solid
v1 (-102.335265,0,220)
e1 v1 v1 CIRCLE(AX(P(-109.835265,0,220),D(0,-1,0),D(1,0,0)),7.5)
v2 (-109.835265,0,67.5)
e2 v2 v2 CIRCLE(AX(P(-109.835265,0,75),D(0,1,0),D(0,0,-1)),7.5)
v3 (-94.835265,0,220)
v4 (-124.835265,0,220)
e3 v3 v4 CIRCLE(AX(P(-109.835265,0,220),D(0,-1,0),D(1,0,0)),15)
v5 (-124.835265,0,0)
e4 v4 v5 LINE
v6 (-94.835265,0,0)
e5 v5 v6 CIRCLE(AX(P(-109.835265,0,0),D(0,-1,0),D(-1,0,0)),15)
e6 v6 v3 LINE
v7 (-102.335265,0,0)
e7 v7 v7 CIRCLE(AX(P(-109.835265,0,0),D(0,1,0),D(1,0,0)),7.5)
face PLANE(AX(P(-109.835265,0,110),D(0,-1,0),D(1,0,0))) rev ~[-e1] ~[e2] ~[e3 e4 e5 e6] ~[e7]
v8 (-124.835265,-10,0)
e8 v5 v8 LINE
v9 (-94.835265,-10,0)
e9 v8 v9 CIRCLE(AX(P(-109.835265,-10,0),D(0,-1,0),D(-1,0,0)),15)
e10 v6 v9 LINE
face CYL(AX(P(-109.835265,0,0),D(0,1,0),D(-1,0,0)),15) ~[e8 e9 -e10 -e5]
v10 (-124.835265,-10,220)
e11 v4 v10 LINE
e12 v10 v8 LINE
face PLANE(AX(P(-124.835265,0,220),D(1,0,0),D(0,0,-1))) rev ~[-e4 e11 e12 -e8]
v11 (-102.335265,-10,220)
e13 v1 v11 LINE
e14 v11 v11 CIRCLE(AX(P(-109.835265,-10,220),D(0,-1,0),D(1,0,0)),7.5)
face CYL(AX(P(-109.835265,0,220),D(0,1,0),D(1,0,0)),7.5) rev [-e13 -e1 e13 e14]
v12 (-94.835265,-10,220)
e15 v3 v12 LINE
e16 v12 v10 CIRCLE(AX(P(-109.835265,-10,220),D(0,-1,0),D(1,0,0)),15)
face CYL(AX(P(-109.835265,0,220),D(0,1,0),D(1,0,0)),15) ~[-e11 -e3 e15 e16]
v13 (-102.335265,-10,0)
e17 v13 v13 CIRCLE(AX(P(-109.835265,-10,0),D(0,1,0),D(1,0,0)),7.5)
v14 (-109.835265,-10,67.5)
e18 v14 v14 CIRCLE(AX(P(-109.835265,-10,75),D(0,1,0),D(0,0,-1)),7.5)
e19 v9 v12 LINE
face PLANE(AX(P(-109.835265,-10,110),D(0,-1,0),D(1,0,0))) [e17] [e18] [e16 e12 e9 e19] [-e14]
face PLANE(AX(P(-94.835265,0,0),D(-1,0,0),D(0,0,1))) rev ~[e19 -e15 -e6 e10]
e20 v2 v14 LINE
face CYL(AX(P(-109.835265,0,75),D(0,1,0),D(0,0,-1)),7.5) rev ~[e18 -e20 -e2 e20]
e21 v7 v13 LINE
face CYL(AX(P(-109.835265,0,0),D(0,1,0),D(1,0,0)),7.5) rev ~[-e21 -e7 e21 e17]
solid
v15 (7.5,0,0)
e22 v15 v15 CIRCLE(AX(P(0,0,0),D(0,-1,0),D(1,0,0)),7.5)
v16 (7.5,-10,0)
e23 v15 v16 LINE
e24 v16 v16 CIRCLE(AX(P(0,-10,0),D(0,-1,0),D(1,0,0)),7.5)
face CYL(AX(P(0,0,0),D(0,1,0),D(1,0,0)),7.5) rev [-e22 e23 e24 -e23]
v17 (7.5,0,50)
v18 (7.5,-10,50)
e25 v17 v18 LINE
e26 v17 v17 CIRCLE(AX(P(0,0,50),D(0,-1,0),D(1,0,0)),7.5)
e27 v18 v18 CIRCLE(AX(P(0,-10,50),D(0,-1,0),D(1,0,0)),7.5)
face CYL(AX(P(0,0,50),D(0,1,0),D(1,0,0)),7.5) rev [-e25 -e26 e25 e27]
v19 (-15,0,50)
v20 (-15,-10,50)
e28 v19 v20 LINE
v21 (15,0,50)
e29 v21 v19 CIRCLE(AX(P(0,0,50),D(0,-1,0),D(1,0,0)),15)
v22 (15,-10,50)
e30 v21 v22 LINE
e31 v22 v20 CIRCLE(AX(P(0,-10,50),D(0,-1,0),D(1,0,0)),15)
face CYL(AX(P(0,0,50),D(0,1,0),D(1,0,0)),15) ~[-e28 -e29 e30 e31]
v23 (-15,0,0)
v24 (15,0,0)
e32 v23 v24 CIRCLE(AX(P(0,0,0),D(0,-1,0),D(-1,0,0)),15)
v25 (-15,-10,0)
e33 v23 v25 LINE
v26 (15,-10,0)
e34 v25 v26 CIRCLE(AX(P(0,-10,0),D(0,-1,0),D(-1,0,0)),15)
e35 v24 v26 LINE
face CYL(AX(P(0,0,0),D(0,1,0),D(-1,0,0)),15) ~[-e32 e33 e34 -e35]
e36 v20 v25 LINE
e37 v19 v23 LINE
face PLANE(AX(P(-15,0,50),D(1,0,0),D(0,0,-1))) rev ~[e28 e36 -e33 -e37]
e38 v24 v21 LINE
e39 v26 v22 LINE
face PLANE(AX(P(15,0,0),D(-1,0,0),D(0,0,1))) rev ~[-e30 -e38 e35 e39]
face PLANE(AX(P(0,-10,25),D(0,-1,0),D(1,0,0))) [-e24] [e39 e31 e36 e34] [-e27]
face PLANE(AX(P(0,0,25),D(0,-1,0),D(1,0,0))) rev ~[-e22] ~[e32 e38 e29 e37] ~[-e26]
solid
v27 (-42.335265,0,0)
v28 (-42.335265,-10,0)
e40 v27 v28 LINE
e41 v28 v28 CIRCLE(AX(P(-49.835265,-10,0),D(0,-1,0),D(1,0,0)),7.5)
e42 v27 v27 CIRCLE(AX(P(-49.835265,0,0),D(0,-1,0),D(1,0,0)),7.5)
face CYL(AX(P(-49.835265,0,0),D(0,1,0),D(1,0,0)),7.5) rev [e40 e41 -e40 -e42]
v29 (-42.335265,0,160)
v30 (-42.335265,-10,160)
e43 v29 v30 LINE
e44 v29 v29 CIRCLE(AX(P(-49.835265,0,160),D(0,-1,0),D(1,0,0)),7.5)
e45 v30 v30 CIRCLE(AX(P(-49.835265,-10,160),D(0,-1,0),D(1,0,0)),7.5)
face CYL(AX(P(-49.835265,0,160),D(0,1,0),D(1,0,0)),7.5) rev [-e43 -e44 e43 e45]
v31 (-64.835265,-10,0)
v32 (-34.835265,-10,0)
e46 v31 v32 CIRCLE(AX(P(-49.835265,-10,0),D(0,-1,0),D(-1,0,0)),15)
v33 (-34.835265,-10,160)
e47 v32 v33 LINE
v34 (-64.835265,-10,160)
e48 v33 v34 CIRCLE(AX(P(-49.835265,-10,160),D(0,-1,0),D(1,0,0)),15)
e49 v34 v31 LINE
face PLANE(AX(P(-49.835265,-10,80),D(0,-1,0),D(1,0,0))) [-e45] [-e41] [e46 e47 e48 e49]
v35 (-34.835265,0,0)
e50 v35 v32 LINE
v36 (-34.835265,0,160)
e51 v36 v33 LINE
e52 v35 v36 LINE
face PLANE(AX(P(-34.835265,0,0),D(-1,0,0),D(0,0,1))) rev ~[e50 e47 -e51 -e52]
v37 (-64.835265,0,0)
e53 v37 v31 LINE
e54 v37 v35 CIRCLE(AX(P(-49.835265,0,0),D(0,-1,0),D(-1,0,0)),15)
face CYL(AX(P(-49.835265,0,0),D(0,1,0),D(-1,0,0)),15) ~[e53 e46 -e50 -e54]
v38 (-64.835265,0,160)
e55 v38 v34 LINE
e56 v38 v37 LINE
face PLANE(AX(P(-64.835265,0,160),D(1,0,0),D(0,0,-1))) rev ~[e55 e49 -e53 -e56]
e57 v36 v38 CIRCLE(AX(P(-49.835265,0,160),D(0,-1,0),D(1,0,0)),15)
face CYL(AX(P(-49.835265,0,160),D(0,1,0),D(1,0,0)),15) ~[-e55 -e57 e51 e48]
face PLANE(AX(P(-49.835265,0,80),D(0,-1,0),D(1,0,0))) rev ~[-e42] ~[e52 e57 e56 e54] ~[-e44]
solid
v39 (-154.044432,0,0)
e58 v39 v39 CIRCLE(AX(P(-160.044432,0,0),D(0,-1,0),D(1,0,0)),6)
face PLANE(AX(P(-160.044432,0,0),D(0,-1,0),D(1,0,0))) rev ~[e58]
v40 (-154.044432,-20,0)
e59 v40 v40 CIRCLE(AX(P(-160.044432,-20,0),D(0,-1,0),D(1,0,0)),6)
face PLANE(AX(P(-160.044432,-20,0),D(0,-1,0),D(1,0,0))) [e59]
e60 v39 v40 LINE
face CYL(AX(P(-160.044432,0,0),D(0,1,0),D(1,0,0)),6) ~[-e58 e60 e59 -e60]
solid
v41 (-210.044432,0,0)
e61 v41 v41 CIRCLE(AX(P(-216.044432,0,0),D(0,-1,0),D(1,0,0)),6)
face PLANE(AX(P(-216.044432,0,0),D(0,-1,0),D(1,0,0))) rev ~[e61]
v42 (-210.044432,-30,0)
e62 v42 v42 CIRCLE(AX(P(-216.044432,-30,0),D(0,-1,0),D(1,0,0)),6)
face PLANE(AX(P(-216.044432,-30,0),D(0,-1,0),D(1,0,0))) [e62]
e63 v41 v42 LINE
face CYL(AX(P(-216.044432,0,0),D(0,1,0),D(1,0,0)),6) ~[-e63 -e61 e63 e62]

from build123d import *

# Parameters (mm, degrees)
F1_R      = 7.5
F2_DEPTH  = 10
F3_R      = 7.5
F4_DEPTH  = 10
F5_R      = 7.5
F6_DEPTH  = 10
F7_R      = 6
F8_DEPTH  = 20
F9_R      = 6
F10_DEPTH = 30


with BuildPart() as f2:
    # F1 (on Front) → F2 (new body)
    with BuildSketch(Plane.XZ):
        with BuildLine():
            Line((-15, 50), (-15, 0))
            ThreePointArc((-15, 0), (0, -15), (15, 0))
            Line((15, 0), (15, 50))
            ThreePointArc((15, 50), (0, 65), (-15, 50))
        make_face()
        Circle(F1_R, mode=Mode.SUBTRACT)
        with Locations((0, 50)):
            Circle(F1_R, mode=Mode.SUBTRACT)
    extrude(amount=F2_DEPTH)


with BuildPart() as f4:
    # F3 (on Front) → F4 (new body)
    with BuildSketch(Plane.XZ):
        with BuildLine():
            Line((-64.8352653698, 160), (-64.8352653698, 0))
            ThreePointArc((-64.8352653698, 0), (-49.8352653698, -15), (-34.8352653698, 0))
            Line((-34.8352653698, 0), (-34.8352653698, 160))
            ThreePointArc((-34.8352653698, 160), (-49.8352653698, 175), (-64.8352653698, 160))
        make_face()
        with Locations((-49.8352653698, 0)):
            Circle(F3_R, mode=Mode.SUBTRACT)
        with Locations((-49.8352653698, 160)):
            Circle(F3_R, mode=Mode.SUBTRACT)
    extrude(amount=F4_DEPTH)


with BuildPart() as f6:
    # F5 (on Front) → F6 (new body)
    with BuildSketch(Plane.XZ):
        with BuildLine():
            Line((-124.8352653698, 220), (-124.8352653698, 0))
            ThreePointArc((-124.8352653698, 0), (-109.8352653698, -15), (-94.8352653698, 0))
            Line((-94.8352653698, 0), (-94.8352653698, 220))
            ThreePointArc((-94.8352653698, 220), (-109.8352653698, 235), (-124.8352653698, 220))
        make_face()
        with BuildLine():
            ThreePointArc((-109.8352653698, 7.5), (-104.5319645109, 5.3033008589), (-102.3352653698, 0))
            ThreePointArc((-102.3352653698, 0), (-115.1385662287, -5.3033008589), (-109.8352653698, 7.5))
        make_face(mode=Mode.SUBTRACT)
        with BuildLine():
            ThreePointArc((-102.3352653698, 75), (-104.5319645109, 69.6966991411), (-109.8352653698, 67.5))
            ThreePointArc((-109.8352653698, 67.5), (-115.1385662287, 80.3033008589), (-102.3352653698, 75))
        make_face(mode=Mode.SUBTRACT)
        with Locations((-109.8352653698, 220)):
            Circle(F5_R, mode=Mode.SUBTRACT)
    extrude(amount=F6_DEPTH)


with BuildPart() as f8:
    # F7 (on Front) → F8 (new body)
    with BuildSketch(Plane.XZ):
        with Locations((-160.0444316864, 0)):
            Circle(F7_R)
    extrude(amount=F8_DEPTH)


with BuildPart() as f10:
    # F9 (on Front) → F10 (new body)
    with BuildSketch(Plane.XZ):
        with Locations((-216.0444316864, 0)):
            Circle(F9_R)
    extrude(amount=F10_DEPTH)


solid = Compound([f2.part, f4.part, f6.part, f8.part, f10.part])
